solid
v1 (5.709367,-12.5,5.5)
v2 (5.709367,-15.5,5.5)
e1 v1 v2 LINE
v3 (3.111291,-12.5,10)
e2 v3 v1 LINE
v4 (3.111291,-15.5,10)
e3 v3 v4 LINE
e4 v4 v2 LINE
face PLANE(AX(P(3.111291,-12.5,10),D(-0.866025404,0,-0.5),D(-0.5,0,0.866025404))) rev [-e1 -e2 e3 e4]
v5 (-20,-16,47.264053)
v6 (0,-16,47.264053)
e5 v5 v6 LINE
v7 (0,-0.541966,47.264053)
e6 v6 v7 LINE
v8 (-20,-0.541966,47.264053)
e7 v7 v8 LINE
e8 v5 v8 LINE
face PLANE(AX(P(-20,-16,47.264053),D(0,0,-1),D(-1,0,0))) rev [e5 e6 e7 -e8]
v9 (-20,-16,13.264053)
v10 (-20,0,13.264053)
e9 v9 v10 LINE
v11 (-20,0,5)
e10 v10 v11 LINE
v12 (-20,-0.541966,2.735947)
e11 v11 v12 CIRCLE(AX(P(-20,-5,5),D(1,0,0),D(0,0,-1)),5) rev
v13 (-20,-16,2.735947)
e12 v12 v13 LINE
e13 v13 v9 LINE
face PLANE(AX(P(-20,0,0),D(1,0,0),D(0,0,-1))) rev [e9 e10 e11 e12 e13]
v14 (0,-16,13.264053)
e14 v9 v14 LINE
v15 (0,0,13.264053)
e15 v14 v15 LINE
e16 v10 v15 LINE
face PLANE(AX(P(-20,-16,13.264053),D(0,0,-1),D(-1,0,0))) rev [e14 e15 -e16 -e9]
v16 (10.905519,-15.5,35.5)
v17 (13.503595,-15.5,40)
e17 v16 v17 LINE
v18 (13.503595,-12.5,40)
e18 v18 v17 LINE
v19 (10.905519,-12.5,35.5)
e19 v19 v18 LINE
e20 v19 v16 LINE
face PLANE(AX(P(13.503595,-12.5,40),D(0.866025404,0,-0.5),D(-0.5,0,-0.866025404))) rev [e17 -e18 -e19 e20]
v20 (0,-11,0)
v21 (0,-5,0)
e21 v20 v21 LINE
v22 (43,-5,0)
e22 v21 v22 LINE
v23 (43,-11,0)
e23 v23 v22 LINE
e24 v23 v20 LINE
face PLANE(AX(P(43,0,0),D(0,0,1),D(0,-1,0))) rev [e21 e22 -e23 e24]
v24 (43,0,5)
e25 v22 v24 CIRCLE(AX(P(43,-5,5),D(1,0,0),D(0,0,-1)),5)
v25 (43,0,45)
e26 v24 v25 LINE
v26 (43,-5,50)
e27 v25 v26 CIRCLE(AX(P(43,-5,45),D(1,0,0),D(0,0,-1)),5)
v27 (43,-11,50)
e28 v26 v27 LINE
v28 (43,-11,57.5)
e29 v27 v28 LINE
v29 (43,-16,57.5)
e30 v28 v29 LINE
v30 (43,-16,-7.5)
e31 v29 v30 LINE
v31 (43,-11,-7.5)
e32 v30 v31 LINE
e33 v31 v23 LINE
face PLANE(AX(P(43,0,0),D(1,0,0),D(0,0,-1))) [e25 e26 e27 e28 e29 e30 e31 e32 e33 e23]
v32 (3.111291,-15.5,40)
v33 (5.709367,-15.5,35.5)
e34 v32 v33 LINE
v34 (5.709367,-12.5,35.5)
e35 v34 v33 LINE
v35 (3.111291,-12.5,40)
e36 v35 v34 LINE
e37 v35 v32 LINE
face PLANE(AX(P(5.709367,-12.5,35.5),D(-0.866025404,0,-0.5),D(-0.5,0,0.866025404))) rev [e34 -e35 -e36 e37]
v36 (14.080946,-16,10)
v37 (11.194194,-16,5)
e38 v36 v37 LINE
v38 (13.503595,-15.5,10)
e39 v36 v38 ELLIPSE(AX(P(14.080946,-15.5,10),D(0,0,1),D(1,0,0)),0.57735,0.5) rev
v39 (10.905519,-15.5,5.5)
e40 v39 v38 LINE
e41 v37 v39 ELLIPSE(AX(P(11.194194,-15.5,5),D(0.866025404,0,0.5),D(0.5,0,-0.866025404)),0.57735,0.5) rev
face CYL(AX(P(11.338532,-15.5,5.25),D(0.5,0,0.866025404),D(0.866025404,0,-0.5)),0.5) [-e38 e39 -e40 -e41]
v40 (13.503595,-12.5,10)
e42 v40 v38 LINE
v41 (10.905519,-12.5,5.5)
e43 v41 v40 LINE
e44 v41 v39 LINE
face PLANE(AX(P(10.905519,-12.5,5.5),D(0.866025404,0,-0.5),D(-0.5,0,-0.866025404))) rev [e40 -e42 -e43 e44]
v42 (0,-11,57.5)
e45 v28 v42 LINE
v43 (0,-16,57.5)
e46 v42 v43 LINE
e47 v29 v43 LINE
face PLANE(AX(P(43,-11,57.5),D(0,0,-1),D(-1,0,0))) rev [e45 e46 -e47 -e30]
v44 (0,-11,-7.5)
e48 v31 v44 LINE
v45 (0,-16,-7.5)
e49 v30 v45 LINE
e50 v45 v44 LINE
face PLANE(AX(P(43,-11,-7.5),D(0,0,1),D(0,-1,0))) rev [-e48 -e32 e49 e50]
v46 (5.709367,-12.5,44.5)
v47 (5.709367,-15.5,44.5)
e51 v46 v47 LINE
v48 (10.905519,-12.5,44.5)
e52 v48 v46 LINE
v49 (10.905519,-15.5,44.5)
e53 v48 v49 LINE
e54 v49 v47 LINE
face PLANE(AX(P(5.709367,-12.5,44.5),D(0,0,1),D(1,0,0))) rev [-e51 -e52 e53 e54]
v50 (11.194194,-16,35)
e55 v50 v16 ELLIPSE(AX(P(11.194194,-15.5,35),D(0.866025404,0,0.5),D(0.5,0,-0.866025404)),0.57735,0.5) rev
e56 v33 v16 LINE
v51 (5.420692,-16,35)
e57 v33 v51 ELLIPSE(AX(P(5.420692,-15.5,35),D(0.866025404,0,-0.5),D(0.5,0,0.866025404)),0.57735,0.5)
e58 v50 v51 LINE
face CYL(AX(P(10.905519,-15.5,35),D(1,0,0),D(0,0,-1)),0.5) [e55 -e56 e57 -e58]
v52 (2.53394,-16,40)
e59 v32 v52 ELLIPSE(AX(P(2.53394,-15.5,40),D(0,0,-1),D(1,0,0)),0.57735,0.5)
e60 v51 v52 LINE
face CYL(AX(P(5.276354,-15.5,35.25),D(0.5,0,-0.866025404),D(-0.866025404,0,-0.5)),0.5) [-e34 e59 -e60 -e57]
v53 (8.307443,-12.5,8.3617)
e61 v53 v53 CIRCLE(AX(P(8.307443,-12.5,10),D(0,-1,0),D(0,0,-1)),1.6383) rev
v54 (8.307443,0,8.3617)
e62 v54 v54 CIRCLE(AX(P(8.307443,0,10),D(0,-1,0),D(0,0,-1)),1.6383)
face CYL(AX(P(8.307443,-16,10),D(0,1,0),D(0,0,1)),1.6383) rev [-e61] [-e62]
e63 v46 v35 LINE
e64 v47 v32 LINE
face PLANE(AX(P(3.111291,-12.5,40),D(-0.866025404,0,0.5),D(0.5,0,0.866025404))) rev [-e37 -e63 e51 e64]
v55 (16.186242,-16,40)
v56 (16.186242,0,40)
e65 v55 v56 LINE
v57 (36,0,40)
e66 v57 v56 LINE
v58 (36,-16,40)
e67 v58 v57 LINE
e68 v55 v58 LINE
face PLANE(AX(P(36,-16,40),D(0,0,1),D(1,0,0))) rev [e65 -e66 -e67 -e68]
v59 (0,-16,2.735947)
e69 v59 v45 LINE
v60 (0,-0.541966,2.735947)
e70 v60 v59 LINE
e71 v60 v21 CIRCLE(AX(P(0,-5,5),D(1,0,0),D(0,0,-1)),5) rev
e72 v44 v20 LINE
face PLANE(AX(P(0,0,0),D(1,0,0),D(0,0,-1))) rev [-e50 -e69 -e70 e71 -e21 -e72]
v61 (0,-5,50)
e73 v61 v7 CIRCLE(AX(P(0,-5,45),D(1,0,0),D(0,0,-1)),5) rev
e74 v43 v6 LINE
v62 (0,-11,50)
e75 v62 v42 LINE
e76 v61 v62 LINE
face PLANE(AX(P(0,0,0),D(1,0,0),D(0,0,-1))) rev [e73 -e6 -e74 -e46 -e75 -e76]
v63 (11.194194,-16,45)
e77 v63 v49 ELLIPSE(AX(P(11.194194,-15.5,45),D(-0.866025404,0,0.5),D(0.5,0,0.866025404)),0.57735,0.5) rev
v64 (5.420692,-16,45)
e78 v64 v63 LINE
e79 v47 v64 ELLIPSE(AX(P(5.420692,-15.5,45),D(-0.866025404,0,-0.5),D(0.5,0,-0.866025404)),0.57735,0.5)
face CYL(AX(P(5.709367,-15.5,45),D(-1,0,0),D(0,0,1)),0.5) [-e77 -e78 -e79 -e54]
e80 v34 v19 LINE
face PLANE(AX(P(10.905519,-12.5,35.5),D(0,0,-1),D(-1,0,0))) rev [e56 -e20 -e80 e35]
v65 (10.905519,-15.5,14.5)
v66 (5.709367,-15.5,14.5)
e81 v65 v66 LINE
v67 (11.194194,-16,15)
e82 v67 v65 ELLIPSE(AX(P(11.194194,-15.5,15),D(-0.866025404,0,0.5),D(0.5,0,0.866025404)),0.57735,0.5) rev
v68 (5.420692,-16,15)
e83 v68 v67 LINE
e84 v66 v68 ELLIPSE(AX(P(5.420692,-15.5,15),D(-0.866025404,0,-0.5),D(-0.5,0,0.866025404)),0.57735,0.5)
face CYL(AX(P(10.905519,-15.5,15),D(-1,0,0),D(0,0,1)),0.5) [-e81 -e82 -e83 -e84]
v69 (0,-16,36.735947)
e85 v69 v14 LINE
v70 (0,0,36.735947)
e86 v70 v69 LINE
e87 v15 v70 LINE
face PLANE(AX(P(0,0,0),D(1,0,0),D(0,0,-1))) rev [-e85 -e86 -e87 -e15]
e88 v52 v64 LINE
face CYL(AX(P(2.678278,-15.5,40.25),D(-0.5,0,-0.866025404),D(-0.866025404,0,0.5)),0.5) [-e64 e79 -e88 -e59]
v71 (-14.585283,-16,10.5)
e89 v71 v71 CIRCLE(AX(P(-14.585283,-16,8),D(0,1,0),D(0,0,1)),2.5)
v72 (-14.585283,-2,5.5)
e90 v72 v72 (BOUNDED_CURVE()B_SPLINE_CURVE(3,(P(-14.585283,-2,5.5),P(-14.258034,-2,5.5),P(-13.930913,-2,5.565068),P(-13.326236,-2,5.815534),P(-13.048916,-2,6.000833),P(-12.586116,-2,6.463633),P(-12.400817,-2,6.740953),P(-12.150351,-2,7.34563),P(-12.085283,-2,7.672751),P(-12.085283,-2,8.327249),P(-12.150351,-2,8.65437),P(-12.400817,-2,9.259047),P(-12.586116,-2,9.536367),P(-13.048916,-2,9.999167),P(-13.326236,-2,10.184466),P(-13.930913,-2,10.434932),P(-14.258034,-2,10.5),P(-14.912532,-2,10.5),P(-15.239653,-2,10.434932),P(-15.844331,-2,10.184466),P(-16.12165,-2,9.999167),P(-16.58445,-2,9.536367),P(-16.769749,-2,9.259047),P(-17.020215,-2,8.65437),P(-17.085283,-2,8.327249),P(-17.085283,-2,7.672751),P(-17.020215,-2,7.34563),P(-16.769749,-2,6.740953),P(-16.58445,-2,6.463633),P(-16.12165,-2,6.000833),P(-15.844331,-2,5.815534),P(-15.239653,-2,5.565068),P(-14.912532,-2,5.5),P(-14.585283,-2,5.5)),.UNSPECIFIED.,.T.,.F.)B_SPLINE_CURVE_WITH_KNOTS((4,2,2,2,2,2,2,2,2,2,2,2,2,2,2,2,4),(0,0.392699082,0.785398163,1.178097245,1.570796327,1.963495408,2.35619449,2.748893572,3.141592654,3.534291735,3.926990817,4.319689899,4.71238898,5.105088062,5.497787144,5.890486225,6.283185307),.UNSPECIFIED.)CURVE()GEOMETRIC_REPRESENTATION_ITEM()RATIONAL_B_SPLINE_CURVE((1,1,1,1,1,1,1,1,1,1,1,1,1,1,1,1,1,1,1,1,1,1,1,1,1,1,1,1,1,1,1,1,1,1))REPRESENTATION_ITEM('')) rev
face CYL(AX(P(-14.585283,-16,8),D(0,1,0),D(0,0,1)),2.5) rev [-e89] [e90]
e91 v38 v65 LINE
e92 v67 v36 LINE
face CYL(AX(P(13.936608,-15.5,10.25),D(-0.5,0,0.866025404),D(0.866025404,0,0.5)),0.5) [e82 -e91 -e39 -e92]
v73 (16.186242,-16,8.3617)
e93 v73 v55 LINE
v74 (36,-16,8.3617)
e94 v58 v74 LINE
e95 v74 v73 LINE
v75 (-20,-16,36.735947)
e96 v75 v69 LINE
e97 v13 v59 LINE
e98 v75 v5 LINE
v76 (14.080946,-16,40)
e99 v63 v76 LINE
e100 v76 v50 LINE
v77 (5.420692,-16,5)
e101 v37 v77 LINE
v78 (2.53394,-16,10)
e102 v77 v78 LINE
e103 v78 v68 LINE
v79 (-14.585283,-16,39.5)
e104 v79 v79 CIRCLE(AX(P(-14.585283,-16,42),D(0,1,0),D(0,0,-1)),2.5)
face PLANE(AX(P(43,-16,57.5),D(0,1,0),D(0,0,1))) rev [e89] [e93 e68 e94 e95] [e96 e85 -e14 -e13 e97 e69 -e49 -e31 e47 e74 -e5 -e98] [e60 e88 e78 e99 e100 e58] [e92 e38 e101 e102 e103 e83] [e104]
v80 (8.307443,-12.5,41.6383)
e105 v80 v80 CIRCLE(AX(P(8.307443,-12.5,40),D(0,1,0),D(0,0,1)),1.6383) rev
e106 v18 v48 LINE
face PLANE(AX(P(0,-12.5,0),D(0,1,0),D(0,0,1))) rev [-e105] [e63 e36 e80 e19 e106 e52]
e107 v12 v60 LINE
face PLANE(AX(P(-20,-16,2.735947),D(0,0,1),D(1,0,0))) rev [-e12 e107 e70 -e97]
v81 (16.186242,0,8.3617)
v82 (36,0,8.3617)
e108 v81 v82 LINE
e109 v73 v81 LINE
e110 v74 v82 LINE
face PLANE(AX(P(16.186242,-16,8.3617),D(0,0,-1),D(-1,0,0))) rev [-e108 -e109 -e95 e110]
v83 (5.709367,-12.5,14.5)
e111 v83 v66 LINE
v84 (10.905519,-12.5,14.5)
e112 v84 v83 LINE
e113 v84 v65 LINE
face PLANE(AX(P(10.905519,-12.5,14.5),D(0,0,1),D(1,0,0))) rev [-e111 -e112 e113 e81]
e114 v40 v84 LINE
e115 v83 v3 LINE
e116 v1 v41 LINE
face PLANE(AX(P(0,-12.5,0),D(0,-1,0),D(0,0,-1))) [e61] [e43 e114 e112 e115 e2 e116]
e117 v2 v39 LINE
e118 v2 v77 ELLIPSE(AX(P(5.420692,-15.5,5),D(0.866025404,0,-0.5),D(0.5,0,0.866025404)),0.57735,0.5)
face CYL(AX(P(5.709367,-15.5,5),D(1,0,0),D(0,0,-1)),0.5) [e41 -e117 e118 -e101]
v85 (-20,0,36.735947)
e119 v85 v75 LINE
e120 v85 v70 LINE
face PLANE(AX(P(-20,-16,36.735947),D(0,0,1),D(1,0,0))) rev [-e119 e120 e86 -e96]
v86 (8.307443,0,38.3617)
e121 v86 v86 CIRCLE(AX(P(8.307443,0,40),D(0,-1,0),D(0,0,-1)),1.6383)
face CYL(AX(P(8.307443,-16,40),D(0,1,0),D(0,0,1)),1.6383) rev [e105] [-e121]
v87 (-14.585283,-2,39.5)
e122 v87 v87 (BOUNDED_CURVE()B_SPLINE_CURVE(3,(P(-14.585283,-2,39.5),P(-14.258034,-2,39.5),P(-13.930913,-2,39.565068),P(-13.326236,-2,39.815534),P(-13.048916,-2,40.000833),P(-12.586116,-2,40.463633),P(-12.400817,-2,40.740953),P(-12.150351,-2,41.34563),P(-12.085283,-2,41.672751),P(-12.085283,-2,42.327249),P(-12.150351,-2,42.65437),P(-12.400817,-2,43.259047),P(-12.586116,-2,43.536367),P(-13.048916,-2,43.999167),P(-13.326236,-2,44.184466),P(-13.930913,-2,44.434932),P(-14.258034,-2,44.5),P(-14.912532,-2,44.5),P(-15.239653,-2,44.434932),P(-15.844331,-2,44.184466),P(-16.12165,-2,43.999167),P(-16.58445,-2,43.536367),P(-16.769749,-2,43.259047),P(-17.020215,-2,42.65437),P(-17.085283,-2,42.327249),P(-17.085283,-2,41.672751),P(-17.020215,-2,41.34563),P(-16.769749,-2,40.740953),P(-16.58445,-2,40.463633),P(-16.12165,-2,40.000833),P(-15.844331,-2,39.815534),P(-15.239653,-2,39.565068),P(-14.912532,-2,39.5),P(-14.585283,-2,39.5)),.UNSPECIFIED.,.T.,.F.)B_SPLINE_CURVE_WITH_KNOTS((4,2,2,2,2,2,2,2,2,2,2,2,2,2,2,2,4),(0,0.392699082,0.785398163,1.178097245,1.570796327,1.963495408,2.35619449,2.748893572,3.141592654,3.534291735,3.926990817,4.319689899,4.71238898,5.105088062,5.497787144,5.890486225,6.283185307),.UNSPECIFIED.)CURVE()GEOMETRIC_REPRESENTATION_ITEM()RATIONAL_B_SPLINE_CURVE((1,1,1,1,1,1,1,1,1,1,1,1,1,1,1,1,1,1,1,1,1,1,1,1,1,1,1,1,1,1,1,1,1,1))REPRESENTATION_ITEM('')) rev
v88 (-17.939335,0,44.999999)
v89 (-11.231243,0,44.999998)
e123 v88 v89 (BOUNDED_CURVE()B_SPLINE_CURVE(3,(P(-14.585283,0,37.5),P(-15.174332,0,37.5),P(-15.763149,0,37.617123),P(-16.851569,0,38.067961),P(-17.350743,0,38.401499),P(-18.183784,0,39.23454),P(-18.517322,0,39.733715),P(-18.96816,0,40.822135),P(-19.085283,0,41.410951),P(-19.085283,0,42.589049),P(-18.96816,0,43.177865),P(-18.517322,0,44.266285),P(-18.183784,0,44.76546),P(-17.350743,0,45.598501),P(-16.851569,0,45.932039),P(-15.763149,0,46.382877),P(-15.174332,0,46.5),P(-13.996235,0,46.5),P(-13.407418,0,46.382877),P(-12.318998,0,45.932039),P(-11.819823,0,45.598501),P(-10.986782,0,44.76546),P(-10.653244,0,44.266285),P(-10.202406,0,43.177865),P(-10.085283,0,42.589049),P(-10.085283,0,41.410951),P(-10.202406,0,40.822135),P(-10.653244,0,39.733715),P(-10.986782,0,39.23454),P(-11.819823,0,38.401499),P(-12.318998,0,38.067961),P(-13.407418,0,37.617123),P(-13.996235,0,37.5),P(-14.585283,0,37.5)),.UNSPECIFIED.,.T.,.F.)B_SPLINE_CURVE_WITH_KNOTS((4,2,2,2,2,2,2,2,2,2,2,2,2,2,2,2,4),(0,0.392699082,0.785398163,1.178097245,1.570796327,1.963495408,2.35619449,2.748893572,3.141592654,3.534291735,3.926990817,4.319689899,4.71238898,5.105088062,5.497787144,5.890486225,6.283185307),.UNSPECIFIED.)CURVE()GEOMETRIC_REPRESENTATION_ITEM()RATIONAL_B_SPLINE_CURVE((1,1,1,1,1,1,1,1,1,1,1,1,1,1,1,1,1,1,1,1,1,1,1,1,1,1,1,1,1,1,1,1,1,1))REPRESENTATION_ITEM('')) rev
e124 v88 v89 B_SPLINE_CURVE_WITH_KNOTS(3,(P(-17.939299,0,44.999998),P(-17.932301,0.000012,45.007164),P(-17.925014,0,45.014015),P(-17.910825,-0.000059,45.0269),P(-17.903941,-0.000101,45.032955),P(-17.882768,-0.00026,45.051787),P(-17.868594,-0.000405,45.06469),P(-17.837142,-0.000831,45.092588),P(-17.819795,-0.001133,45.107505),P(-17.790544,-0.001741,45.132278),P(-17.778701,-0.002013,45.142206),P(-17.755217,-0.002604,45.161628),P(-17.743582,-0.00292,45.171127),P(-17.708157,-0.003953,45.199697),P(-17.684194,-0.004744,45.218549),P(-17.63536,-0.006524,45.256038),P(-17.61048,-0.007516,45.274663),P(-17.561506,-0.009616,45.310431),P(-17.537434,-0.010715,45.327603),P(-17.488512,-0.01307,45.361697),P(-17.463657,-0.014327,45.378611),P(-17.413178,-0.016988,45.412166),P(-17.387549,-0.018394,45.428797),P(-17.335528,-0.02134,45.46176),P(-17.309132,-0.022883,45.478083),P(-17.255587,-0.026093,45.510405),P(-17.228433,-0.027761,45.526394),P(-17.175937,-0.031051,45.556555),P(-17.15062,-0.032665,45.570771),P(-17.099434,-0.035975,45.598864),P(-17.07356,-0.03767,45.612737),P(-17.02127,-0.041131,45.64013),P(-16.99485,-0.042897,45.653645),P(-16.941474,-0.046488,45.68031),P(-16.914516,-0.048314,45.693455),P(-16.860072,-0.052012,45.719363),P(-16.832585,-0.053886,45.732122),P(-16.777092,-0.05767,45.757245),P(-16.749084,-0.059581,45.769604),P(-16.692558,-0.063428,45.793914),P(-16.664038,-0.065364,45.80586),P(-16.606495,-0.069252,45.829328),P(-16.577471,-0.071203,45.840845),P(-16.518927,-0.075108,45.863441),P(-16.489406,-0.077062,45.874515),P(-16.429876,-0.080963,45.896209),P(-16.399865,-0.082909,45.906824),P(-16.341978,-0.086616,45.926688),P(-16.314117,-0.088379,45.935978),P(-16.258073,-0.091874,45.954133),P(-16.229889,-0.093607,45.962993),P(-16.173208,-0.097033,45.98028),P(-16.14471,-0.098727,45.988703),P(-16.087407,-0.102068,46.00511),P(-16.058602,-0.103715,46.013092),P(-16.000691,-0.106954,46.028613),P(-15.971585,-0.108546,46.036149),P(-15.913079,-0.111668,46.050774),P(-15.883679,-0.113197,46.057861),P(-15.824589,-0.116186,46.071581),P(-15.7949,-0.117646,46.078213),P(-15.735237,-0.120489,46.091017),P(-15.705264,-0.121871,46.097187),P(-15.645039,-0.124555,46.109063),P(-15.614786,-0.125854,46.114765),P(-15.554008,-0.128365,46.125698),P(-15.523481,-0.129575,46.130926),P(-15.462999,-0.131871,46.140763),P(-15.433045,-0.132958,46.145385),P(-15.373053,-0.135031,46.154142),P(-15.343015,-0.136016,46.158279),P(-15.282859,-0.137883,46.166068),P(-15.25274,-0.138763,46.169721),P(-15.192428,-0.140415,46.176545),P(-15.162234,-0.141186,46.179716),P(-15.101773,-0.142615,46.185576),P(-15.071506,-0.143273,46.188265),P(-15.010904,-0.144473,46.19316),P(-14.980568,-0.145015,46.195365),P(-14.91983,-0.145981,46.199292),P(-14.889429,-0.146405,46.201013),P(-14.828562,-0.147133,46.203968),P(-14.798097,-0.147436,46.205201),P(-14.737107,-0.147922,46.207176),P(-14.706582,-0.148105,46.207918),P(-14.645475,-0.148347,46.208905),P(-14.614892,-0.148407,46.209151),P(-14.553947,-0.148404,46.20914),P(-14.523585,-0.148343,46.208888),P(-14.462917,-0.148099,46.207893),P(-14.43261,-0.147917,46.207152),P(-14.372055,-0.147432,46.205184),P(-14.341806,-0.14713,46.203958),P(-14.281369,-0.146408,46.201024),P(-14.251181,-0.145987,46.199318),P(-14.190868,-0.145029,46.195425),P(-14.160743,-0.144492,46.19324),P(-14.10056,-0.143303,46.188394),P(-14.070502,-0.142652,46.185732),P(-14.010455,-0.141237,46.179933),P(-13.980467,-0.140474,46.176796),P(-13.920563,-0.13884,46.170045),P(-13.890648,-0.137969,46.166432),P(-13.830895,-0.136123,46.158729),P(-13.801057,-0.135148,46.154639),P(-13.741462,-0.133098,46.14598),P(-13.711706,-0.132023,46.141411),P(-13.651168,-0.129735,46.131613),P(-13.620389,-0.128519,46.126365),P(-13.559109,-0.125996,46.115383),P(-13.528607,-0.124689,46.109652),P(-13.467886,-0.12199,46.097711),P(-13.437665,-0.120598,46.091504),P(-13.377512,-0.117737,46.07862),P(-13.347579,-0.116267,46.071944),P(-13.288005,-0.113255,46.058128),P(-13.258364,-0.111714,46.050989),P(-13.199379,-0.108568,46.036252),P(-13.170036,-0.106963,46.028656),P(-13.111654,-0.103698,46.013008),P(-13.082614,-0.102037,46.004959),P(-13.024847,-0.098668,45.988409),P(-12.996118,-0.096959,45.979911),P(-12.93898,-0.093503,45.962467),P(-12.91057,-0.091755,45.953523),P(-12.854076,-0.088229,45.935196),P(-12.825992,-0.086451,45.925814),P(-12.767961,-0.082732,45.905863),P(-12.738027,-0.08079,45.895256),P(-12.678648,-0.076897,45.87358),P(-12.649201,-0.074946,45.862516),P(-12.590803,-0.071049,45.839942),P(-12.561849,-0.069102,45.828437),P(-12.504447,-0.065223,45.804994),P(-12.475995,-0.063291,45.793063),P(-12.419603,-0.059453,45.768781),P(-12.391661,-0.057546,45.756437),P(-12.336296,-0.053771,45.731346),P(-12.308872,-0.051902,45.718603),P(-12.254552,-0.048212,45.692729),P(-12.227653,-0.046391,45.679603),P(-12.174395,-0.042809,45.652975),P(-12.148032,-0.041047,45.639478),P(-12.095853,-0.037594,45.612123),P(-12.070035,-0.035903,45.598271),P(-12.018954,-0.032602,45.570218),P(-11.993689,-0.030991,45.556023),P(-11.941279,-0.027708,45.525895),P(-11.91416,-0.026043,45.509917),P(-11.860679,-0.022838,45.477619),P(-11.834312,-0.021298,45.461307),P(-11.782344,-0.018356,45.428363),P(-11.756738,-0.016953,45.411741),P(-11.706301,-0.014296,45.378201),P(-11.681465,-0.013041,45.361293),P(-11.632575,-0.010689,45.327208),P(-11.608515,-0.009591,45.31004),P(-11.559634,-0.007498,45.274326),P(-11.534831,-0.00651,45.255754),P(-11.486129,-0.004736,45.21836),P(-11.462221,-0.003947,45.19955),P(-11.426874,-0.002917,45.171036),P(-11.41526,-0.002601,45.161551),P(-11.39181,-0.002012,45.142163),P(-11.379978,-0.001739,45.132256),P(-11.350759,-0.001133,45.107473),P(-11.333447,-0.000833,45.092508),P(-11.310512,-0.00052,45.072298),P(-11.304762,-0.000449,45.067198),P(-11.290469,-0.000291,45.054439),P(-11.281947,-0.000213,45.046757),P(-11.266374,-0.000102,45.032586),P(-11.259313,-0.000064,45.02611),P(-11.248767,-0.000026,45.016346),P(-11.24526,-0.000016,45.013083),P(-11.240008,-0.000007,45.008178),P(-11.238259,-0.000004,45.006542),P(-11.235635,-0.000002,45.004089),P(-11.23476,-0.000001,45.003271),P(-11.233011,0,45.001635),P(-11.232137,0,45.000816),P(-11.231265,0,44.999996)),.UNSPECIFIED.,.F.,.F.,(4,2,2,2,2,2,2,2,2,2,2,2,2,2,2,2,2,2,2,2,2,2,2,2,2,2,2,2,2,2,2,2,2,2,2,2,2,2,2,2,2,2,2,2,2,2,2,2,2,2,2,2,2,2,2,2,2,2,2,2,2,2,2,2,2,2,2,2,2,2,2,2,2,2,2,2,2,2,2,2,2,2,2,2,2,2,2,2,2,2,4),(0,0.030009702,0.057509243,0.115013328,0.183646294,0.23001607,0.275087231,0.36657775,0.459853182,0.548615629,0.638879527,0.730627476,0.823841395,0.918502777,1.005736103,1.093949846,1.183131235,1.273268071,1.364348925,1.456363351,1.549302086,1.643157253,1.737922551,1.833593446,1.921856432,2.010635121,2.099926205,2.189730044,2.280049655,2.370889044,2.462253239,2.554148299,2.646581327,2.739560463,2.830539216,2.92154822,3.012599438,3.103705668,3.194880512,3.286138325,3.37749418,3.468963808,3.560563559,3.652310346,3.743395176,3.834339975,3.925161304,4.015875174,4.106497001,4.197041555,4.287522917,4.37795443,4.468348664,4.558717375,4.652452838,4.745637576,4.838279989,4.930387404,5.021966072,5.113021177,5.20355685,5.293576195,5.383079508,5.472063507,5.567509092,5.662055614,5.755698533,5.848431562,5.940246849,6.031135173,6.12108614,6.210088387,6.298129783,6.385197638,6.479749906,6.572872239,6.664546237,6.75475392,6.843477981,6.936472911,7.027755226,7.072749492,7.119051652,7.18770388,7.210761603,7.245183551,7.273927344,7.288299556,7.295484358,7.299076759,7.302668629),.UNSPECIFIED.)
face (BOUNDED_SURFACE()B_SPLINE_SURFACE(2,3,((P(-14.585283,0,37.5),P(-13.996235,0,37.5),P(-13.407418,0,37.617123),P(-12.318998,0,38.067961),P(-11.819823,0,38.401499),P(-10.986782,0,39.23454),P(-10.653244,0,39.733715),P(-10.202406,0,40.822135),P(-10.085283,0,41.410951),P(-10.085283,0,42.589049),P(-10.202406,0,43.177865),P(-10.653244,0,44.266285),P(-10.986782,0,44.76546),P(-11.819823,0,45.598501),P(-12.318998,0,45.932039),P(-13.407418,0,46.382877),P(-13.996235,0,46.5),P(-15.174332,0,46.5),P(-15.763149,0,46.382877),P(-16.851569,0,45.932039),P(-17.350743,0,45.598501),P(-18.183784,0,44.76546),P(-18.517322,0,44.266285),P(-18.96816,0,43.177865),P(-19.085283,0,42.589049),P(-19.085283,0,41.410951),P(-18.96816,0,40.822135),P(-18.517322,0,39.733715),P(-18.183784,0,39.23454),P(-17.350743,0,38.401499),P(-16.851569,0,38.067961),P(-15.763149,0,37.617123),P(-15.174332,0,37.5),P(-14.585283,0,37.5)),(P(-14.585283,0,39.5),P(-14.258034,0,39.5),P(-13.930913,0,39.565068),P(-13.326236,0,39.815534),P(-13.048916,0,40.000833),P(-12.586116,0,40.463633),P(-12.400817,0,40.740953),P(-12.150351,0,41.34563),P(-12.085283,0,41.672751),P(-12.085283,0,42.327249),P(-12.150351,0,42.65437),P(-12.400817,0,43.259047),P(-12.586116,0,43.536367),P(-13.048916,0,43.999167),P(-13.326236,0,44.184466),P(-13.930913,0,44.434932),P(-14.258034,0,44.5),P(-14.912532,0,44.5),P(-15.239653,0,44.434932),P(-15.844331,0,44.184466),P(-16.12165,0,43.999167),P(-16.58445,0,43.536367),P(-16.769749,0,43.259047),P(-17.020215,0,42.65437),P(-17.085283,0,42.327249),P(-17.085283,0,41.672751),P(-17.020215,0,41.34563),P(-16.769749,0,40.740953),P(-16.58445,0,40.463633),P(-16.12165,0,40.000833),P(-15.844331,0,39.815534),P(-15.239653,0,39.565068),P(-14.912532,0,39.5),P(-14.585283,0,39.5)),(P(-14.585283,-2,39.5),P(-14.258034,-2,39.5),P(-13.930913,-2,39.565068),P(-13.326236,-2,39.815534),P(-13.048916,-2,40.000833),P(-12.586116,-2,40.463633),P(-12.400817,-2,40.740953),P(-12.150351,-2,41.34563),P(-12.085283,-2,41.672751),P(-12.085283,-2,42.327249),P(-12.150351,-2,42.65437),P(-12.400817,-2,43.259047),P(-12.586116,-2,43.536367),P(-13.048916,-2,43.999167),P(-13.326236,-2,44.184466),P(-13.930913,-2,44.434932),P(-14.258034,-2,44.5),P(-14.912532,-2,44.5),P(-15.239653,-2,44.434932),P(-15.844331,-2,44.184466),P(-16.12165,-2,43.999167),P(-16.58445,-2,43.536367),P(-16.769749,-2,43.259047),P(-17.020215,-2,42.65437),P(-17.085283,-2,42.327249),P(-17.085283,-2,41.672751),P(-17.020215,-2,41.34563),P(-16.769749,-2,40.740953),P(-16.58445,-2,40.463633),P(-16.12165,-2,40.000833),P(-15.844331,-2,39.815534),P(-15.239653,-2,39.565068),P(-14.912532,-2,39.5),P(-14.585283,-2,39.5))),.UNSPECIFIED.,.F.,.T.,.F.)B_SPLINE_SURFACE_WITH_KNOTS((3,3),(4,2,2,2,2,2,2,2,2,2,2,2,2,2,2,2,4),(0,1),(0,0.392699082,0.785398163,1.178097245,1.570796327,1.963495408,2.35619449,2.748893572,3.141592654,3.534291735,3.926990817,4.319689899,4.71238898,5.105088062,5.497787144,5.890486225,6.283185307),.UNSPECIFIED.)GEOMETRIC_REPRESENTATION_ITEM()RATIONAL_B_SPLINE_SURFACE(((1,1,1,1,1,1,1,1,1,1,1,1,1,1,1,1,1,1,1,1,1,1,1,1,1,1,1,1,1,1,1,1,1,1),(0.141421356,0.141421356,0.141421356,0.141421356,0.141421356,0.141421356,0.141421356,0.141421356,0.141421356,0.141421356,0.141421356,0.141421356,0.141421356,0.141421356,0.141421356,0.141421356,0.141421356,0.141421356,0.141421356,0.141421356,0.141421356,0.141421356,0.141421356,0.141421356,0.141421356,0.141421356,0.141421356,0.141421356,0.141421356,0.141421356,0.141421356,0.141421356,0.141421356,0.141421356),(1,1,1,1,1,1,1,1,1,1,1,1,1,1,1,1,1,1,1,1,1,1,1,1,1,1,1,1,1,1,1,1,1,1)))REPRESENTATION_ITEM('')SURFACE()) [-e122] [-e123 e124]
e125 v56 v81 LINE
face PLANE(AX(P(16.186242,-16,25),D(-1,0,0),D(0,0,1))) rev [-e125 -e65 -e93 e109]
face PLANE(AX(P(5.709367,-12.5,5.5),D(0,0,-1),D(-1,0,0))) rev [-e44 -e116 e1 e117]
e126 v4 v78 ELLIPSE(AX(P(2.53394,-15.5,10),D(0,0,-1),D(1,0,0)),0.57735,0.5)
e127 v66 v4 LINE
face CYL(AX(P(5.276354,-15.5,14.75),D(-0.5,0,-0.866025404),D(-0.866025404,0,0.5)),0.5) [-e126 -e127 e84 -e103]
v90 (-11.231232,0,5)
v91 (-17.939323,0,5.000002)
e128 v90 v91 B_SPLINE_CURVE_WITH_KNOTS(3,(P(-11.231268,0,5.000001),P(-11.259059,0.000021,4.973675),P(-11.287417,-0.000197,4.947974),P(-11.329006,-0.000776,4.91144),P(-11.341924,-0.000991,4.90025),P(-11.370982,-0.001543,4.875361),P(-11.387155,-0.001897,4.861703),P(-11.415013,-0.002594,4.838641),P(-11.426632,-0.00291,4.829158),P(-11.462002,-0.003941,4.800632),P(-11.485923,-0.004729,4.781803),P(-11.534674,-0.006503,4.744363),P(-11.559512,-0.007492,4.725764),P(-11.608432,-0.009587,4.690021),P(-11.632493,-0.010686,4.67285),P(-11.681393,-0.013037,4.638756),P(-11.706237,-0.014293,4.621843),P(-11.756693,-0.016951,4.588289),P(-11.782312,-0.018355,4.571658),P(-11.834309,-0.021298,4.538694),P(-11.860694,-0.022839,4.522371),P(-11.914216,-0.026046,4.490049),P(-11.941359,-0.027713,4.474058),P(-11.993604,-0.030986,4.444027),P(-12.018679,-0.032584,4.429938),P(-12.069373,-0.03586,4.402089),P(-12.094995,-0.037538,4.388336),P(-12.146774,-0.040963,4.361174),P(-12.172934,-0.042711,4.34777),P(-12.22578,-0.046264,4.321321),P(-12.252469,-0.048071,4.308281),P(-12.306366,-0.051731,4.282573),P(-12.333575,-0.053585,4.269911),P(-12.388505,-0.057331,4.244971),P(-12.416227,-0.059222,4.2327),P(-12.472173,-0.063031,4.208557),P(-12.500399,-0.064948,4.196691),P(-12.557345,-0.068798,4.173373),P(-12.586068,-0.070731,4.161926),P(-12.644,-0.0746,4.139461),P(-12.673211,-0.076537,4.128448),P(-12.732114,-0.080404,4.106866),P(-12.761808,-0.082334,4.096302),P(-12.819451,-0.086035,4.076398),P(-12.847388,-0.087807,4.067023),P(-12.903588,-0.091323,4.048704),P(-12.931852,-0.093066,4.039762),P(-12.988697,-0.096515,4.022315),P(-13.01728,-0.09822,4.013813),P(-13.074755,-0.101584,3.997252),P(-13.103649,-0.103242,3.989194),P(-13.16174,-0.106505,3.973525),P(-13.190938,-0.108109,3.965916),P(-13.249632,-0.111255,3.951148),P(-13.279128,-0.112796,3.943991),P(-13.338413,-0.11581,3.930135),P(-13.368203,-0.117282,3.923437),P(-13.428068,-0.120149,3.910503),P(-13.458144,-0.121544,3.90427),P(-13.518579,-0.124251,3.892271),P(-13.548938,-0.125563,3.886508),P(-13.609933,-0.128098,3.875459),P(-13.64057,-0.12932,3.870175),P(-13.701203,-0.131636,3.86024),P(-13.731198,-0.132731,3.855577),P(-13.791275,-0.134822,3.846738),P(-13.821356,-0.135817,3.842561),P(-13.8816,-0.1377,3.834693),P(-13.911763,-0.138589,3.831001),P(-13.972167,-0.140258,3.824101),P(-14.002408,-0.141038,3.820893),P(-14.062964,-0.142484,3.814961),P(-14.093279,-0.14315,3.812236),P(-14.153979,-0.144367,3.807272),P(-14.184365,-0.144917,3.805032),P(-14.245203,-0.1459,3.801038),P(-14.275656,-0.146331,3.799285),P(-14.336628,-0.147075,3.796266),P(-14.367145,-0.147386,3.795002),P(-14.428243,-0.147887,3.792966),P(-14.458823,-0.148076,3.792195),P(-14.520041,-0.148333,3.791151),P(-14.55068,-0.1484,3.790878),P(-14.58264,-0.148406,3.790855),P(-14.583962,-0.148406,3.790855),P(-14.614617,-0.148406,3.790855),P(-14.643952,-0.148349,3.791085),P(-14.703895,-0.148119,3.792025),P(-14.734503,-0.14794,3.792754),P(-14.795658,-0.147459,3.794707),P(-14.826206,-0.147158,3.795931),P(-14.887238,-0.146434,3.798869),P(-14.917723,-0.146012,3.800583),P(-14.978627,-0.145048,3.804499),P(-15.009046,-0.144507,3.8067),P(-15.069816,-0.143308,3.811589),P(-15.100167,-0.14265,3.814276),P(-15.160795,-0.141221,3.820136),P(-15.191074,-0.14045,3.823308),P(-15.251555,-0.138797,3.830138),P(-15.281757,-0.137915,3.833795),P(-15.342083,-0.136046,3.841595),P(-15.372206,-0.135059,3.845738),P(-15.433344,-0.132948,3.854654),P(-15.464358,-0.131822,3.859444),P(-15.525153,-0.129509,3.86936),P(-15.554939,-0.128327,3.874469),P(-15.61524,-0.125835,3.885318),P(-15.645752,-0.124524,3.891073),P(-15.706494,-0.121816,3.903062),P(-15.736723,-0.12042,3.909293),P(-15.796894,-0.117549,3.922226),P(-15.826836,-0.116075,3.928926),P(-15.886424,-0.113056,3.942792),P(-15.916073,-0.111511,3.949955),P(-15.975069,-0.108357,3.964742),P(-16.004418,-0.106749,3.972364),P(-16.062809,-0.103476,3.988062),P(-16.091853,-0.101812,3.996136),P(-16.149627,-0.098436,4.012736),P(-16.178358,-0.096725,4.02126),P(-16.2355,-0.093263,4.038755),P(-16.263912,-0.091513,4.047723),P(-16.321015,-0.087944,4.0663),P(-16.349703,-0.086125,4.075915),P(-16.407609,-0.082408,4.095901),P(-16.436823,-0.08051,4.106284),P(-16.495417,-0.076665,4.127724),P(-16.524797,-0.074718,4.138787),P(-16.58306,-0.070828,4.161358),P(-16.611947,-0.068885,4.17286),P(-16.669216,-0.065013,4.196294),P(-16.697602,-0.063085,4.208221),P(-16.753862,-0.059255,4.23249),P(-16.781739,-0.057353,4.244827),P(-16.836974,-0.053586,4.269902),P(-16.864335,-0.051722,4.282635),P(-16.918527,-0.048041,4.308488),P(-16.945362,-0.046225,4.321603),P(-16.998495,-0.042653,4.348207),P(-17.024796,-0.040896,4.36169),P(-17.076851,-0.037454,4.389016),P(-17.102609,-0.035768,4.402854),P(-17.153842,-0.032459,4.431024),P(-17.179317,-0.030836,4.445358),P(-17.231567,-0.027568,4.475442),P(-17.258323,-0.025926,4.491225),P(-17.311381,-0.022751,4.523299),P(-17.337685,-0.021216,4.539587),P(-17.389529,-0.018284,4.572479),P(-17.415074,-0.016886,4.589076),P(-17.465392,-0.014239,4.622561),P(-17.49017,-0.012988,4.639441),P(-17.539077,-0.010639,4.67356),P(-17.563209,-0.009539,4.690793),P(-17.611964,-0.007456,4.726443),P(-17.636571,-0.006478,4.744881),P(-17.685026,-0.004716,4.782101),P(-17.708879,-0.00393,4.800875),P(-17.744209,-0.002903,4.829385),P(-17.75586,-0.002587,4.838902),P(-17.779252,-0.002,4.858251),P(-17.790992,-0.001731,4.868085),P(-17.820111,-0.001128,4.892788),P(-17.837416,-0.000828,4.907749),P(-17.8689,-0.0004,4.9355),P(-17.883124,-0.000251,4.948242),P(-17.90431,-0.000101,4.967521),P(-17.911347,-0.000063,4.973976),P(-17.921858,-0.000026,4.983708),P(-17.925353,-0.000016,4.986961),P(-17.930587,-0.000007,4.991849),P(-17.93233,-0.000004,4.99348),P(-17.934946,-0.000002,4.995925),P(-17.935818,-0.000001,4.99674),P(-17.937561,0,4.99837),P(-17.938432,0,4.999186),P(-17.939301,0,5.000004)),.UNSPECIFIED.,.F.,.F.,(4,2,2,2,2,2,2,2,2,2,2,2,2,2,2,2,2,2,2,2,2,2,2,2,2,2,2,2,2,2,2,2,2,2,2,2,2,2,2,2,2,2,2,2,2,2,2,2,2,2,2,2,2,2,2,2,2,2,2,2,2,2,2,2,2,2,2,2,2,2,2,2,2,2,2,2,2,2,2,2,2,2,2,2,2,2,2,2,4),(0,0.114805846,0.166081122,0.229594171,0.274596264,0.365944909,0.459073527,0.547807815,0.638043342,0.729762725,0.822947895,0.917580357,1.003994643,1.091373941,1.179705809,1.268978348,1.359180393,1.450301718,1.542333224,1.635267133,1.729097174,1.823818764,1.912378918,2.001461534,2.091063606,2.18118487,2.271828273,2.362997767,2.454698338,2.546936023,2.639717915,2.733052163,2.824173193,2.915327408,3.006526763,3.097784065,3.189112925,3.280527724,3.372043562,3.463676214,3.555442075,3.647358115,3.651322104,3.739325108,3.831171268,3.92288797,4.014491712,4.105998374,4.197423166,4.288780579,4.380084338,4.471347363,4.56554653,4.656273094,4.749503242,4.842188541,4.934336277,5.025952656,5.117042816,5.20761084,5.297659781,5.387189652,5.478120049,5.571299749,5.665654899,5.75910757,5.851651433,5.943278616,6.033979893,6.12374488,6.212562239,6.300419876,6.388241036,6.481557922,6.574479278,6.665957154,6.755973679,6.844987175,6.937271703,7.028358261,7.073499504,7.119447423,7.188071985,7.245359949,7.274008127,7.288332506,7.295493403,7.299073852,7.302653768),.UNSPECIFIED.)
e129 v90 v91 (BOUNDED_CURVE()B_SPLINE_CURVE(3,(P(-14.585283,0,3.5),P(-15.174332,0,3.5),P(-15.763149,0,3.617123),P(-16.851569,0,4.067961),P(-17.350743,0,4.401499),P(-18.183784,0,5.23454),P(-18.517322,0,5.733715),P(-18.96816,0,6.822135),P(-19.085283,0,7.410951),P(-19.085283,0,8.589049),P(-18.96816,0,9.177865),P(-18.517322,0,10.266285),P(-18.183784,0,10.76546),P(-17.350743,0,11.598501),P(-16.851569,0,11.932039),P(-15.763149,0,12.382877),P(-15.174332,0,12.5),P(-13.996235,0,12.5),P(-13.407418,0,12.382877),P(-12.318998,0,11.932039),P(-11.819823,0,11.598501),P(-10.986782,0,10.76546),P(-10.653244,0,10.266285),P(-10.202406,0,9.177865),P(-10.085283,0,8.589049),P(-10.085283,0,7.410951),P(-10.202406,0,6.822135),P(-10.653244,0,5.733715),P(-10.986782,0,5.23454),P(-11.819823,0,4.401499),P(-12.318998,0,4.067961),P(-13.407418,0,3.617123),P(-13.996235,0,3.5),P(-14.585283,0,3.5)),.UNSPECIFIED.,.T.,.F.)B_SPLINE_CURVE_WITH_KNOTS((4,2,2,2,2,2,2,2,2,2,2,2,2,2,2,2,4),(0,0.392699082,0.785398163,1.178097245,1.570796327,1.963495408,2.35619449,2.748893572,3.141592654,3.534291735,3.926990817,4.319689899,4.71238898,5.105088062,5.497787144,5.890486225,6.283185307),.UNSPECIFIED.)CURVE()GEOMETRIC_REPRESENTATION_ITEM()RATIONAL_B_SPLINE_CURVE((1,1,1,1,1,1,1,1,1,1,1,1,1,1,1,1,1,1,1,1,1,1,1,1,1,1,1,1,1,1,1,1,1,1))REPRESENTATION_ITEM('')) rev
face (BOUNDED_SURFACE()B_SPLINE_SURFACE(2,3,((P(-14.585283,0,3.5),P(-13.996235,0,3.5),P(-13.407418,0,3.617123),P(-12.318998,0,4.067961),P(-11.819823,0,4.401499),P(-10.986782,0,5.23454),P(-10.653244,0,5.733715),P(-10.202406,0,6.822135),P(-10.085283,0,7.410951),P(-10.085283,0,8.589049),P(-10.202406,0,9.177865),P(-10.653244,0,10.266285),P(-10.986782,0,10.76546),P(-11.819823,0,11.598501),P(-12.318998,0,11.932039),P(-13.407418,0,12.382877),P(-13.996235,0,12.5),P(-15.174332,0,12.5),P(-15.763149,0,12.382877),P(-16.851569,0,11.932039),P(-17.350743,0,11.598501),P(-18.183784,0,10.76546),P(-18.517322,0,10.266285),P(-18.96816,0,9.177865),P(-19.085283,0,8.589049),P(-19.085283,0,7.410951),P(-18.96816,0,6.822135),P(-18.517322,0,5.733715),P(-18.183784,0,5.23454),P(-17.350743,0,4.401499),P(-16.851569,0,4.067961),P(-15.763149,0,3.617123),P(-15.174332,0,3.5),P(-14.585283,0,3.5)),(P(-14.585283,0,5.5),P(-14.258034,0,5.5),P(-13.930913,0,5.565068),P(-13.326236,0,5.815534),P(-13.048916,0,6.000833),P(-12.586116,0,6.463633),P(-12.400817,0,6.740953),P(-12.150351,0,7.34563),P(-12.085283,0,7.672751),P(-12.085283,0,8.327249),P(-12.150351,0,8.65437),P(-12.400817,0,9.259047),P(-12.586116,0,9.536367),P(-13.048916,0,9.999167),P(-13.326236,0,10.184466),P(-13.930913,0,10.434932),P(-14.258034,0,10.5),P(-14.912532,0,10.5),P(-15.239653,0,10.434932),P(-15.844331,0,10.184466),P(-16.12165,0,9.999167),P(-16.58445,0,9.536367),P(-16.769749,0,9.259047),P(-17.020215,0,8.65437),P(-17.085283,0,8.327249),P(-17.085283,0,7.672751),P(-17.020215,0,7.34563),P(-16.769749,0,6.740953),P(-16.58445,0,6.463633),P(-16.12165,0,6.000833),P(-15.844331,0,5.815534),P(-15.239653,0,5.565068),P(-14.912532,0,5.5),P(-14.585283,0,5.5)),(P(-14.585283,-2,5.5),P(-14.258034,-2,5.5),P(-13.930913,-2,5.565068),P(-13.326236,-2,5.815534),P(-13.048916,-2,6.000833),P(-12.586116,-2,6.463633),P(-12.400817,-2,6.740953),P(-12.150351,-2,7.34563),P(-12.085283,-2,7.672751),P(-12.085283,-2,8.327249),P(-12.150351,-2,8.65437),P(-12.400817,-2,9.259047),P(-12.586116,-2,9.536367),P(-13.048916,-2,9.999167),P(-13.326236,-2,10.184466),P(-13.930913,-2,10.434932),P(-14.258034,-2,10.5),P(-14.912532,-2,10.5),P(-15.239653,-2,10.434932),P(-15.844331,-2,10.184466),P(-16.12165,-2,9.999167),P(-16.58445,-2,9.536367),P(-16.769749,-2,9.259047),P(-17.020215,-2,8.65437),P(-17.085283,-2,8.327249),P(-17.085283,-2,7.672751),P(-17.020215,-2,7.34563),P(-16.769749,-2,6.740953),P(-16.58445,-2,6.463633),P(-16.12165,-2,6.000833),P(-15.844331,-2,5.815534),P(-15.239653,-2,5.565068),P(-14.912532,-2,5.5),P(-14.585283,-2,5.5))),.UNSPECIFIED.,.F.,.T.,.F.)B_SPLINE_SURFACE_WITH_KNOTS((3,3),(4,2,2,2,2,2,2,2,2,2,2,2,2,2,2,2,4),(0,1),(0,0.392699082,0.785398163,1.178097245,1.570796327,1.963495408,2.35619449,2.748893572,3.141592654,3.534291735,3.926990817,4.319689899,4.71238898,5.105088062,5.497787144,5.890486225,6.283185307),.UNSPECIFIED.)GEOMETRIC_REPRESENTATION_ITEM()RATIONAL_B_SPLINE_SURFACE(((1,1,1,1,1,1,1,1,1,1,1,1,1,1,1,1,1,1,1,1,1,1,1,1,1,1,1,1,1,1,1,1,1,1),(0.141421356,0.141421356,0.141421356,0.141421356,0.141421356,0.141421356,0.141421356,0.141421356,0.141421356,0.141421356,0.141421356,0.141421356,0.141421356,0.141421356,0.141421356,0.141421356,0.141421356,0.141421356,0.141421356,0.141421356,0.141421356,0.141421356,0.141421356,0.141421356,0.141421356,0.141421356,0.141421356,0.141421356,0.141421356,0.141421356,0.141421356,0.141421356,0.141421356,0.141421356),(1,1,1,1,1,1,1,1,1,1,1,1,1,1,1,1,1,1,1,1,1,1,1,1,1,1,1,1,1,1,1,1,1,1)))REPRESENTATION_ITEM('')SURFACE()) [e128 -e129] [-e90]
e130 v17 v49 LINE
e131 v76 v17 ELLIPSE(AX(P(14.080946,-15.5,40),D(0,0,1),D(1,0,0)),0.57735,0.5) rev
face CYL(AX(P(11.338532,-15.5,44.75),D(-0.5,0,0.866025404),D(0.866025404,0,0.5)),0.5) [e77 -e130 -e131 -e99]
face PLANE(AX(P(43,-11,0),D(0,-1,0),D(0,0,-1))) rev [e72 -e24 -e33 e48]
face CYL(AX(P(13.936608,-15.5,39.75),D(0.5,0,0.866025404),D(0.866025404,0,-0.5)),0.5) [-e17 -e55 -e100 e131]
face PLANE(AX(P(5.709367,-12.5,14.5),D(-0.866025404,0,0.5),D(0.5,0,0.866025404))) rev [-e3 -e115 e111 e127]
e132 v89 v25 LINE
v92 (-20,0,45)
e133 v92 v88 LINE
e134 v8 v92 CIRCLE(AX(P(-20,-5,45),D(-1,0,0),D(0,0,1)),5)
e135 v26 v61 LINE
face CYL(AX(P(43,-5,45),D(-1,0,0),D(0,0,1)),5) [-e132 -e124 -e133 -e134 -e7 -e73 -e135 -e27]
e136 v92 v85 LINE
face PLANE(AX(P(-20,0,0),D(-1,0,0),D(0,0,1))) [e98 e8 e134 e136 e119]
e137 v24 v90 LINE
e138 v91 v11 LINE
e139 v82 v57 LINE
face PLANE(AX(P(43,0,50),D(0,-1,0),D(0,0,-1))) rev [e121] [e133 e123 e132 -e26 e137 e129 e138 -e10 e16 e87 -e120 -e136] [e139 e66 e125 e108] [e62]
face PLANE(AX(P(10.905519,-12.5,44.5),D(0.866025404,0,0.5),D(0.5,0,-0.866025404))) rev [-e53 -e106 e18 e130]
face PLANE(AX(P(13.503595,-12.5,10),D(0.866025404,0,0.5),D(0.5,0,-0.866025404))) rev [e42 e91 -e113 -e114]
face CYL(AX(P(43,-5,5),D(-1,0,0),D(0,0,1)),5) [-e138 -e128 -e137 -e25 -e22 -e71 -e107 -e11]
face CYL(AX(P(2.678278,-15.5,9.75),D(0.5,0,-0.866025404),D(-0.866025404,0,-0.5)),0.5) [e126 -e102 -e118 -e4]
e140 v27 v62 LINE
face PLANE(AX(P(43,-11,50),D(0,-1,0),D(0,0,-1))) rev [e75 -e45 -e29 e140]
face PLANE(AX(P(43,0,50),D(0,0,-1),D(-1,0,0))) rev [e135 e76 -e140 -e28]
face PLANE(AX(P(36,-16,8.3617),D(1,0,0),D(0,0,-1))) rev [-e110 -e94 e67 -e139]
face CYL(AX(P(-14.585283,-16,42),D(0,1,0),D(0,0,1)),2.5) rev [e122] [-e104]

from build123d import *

# Parameters (mm, degrees)
BOSS_EXTRUDE1_DEPTH     = 43
CUT_EXTRUDE6_DEPTH      = 74.561199011
CUT_EXTRUDE6_DEPTH_BACK = 74.561199011
SKETCH8_R               = 1.6383
SKETCH15_W              = 10.528106576
SKETCH15_H              = 16
BOSS_EXTRUDE2_DEPTH     = 20
CUT_EXTRUDE7_DEPTH      = 74.561199011
CUT_EXTRUDE7_DEPTH_BACK = 74.561199011
SKETCH16_R              = 2.5
FILLET5_SIZE            = 2
FILLET6_SIZE            = 2
CUT_EXTRUDE8_DEPTH      = 3.5
FILLET7_R               = 0.5
FILLET8_R               = 0.5
CUT_EXTRUDE9_DEPTH      = 74.561199011
CUT_EXTRUDE9_DEPTH_BACK = 74.561199011
FILLET9_R               = 5


with BuildPart() as part:
    # Sketch1 → Boss-Extrude1 (new body)
    with BuildSketch(Plane(origin=(0, 0, 0), x_dir=(0, 0, -1), z_dir=(1, 0, 0))):
        Polygon((-50, 0), (0, 0), (0, -11), (7.5, -11), (7.5, -16), (-57.5, -16), (-57.5, -11), (-50, -11), align=None)
    extrude(amount=BOSS_EXTRUDE1_DEPTH)

    # Sketch8 → Cut-Extrude6 (cut, two sides: drawn at the far end of the back side and taken through both)
    with BuildSketch(Plane(origin=(0, 0, 0), x_dir=(1, 0, 0), z_dir=(0, 1, 0)).offset(-CUT_EXTRUDE6_DEPTH_BACK)):
        with Locations(Location((8.307443012, -40, 0), (0, 0, 270))):
            Circle(SKETCH8_R)
        with Locations(Location((8.307443012, -10, 0), (0, 0, 270))):
            Circle(SKETCH8_R)
    extrude(amount=CUT_EXTRUDE6_DEPTH + CUT_EXTRUDE6_DEPTH_BACK, mode=Mode.SUBTRACT)

    # Sketch15 → Boss-Extrude2 (add)
    with BuildSketch(Plane.ZY):
        with Locations((42, -8)):
            Rectangle(SKETCH15_W, SKETCH15_H)
        with Locations((8, -8)):
            Rectangle(SKETCH15_W, SKETCH15_H)
    extrude(amount=BOSS_EXTRUDE2_DEPTH)

    # Sketch16 → Cut-Extrude7 (cut, two sides: drawn at the far end of the back side and taken through both)
    with BuildSketch(Plane(origin=(0, 0, 0), x_dir=(1, 0, 0), z_dir=(0, 1, 0)).offset(-CUT_EXTRUDE7_DEPTH_BACK)):
        with Locations(Location((-14.585283135, -8, 0), (0, 0, 270))):
            Circle(SKETCH16_R)
        with Locations(Location((-14.585283135, -42, 0), (0, 0, 90))):
            Circle(SKETCH16_R)
    extrude(amount=CUT_EXTRUDE7_DEPTH + CUT_EXTRUDE7_DEPTH_BACK, mode=Mode.SUBTRACT)

    # Fillet5
    # a fillet whose section is not a circle: 2 mm, written as the material it takes off along each edge
    with BuildSketch(Plane(origin=(-14.585283135, 0, 8), x_dir=(0, 0, 1), z_dir=(-1, 0, 0))) as fillet5_piece_1:
        with BuildLine():
            Bezier((2.5 + FILLET5_SIZE, 0), (2.5, 0), (2.5, -FILLET5_SIZE), weights=[1, 0.141421356, 1])
            Line((2.5, -FILLET5_SIZE), (2.5, 0))
            Line((2.5, 0), (2.5 + FILLET5_SIZE, 0))
        make_face()
    revolve(axis=Axis((-14.585283135, 0, 8), (0, 1, 0)), mode=Mode.SUBTRACT)

    # Fillet6
    # a fillet whose section is not a circle: 2 mm, written as the material it takes off along each edge
    with BuildSketch(Plane(origin=(-14.585283135, 0, 42), x_dir=(0, 0, -1), z_dir=(1, 0, 0))) as fillet6_piece_1:
        with BuildLine():
            Bezier((2.5 + FILLET6_SIZE, 0), (2.5, 0), (2.5, -FILLET6_SIZE), weights=[1, 0.141421356, 1])
            Line((2.5, -FILLET6_SIZE), (2.5, 0))
            Line((2.5, 0), (2.5 + FILLET6_SIZE, 0))
        make_face()
    revolve(axis=Axis((-14.585283135, 0, 42), (0, 1, 0)), mode=Mode.SUBTRACT)

    # Sketch20 → Cut-Extrude8 (cut)
    with BuildSketch(Plane.XZ.offset(16)):
        Polygon((13.503595435, 10), (10.905519224, 14.5), (5.709366801, 14.5), (3.11129059, 10), (5.709366801, 5.5), (10.905519224, 5.5), align=None)
        Polygon((10.905519224, 44.5), (13.503595435, 40), (10.905519224, 35.5), (5.709366801, 35.5), (3.11129059, 40), (5.709366801, 44.5), align=None)
    extrude(amount=-CUT_EXTRUDE8_DEPTH, mode=Mode.SUBTRACT)

    # Fillet7
    fillet7_edges = [part.edges().sort_by_distance(p)[0] for p in [
        (12.204557329, -16, 7.75),
        (12.204557329, -16, 12.25),
        (8.307443012, -16, 14.5),
        (4.410328695, -16, 12.25),
        (4.410328695, -16, 7.75),
        (8.307443012, -16, 5.5),
    ]]
    fillet(fillet7_edges, radius=FILLET7_R)

    # Fillet8
    fillet8_edges = [part.edges().sort_by_distance(p)[0] for p in [
        (8.307443012, -16, 44.5),
        (4.410328695, -16, 42.25),
        (4.410328695, -16, 37.75),
        (8.307443012, -16, 35.5),
        (12.204557329, -16, 37.75),
        (12.204557329, -16, 42.25),
    ]]
    fillet(fillet8_edges, radius=FILLET8_R)

    # Sketch21 → Cut-Extrude9 (cut, two sides: drawn at the far end of the back side and taken through both)
    with BuildSketch(Plane(origin=(0, 0, 0), x_dir=(1, 0, 0), z_dir=(0, 1, 0)).offset(-CUT_EXTRUDE9_DEPTH_BACK)):
        Polygon((16.186241981, -25), (16.186241981, -8.3617), (36, -8.3617), (36, -40), (16.186241981, -40), align=None)
    extrude(amount=CUT_EXTRUDE9_DEPTH + CUT_EXTRUDE9_DEPTH_BACK, mode=Mode.SUBTRACT)

    # Fillet9
    # the kernel refuses this fillet: 5 mm, written as the material it takes off along each edge
    with BuildSketch(Plane(origin=(-30, 0, 50), x_dir=(0, 0, -1), z_dir=(1, 0, 0)), Plane(origin=(-30, 0, 0), x_dir=(0, -1, 0), z_dir=(1, 0, 0))) as fillet9_piece_1:
        with BuildLine():
            CenterArc((FILLET9_R, -FILLET9_R), FILLET9_R, 90, 90)
            Line((0, -FILLET9_R), (-FILLET9_R * 0.02, -FILLET9_R))
            Line((-FILLET9_R * 0.02, -FILLET9_R), (-FILLET9_R * 0.02, FILLET9_R * 0.02))
            Line((-FILLET9_R * 0.02, FILLET9_R * 0.02), (FILLET9_R, FILLET9_R * 0.02))
            Line((FILLET9_R, FILLET9_R * 0.02), (FILLET9_R, 0))
        make_face()
    extrude(amount=103, mode=Mode.SUBTRACT)


solid = part.part
